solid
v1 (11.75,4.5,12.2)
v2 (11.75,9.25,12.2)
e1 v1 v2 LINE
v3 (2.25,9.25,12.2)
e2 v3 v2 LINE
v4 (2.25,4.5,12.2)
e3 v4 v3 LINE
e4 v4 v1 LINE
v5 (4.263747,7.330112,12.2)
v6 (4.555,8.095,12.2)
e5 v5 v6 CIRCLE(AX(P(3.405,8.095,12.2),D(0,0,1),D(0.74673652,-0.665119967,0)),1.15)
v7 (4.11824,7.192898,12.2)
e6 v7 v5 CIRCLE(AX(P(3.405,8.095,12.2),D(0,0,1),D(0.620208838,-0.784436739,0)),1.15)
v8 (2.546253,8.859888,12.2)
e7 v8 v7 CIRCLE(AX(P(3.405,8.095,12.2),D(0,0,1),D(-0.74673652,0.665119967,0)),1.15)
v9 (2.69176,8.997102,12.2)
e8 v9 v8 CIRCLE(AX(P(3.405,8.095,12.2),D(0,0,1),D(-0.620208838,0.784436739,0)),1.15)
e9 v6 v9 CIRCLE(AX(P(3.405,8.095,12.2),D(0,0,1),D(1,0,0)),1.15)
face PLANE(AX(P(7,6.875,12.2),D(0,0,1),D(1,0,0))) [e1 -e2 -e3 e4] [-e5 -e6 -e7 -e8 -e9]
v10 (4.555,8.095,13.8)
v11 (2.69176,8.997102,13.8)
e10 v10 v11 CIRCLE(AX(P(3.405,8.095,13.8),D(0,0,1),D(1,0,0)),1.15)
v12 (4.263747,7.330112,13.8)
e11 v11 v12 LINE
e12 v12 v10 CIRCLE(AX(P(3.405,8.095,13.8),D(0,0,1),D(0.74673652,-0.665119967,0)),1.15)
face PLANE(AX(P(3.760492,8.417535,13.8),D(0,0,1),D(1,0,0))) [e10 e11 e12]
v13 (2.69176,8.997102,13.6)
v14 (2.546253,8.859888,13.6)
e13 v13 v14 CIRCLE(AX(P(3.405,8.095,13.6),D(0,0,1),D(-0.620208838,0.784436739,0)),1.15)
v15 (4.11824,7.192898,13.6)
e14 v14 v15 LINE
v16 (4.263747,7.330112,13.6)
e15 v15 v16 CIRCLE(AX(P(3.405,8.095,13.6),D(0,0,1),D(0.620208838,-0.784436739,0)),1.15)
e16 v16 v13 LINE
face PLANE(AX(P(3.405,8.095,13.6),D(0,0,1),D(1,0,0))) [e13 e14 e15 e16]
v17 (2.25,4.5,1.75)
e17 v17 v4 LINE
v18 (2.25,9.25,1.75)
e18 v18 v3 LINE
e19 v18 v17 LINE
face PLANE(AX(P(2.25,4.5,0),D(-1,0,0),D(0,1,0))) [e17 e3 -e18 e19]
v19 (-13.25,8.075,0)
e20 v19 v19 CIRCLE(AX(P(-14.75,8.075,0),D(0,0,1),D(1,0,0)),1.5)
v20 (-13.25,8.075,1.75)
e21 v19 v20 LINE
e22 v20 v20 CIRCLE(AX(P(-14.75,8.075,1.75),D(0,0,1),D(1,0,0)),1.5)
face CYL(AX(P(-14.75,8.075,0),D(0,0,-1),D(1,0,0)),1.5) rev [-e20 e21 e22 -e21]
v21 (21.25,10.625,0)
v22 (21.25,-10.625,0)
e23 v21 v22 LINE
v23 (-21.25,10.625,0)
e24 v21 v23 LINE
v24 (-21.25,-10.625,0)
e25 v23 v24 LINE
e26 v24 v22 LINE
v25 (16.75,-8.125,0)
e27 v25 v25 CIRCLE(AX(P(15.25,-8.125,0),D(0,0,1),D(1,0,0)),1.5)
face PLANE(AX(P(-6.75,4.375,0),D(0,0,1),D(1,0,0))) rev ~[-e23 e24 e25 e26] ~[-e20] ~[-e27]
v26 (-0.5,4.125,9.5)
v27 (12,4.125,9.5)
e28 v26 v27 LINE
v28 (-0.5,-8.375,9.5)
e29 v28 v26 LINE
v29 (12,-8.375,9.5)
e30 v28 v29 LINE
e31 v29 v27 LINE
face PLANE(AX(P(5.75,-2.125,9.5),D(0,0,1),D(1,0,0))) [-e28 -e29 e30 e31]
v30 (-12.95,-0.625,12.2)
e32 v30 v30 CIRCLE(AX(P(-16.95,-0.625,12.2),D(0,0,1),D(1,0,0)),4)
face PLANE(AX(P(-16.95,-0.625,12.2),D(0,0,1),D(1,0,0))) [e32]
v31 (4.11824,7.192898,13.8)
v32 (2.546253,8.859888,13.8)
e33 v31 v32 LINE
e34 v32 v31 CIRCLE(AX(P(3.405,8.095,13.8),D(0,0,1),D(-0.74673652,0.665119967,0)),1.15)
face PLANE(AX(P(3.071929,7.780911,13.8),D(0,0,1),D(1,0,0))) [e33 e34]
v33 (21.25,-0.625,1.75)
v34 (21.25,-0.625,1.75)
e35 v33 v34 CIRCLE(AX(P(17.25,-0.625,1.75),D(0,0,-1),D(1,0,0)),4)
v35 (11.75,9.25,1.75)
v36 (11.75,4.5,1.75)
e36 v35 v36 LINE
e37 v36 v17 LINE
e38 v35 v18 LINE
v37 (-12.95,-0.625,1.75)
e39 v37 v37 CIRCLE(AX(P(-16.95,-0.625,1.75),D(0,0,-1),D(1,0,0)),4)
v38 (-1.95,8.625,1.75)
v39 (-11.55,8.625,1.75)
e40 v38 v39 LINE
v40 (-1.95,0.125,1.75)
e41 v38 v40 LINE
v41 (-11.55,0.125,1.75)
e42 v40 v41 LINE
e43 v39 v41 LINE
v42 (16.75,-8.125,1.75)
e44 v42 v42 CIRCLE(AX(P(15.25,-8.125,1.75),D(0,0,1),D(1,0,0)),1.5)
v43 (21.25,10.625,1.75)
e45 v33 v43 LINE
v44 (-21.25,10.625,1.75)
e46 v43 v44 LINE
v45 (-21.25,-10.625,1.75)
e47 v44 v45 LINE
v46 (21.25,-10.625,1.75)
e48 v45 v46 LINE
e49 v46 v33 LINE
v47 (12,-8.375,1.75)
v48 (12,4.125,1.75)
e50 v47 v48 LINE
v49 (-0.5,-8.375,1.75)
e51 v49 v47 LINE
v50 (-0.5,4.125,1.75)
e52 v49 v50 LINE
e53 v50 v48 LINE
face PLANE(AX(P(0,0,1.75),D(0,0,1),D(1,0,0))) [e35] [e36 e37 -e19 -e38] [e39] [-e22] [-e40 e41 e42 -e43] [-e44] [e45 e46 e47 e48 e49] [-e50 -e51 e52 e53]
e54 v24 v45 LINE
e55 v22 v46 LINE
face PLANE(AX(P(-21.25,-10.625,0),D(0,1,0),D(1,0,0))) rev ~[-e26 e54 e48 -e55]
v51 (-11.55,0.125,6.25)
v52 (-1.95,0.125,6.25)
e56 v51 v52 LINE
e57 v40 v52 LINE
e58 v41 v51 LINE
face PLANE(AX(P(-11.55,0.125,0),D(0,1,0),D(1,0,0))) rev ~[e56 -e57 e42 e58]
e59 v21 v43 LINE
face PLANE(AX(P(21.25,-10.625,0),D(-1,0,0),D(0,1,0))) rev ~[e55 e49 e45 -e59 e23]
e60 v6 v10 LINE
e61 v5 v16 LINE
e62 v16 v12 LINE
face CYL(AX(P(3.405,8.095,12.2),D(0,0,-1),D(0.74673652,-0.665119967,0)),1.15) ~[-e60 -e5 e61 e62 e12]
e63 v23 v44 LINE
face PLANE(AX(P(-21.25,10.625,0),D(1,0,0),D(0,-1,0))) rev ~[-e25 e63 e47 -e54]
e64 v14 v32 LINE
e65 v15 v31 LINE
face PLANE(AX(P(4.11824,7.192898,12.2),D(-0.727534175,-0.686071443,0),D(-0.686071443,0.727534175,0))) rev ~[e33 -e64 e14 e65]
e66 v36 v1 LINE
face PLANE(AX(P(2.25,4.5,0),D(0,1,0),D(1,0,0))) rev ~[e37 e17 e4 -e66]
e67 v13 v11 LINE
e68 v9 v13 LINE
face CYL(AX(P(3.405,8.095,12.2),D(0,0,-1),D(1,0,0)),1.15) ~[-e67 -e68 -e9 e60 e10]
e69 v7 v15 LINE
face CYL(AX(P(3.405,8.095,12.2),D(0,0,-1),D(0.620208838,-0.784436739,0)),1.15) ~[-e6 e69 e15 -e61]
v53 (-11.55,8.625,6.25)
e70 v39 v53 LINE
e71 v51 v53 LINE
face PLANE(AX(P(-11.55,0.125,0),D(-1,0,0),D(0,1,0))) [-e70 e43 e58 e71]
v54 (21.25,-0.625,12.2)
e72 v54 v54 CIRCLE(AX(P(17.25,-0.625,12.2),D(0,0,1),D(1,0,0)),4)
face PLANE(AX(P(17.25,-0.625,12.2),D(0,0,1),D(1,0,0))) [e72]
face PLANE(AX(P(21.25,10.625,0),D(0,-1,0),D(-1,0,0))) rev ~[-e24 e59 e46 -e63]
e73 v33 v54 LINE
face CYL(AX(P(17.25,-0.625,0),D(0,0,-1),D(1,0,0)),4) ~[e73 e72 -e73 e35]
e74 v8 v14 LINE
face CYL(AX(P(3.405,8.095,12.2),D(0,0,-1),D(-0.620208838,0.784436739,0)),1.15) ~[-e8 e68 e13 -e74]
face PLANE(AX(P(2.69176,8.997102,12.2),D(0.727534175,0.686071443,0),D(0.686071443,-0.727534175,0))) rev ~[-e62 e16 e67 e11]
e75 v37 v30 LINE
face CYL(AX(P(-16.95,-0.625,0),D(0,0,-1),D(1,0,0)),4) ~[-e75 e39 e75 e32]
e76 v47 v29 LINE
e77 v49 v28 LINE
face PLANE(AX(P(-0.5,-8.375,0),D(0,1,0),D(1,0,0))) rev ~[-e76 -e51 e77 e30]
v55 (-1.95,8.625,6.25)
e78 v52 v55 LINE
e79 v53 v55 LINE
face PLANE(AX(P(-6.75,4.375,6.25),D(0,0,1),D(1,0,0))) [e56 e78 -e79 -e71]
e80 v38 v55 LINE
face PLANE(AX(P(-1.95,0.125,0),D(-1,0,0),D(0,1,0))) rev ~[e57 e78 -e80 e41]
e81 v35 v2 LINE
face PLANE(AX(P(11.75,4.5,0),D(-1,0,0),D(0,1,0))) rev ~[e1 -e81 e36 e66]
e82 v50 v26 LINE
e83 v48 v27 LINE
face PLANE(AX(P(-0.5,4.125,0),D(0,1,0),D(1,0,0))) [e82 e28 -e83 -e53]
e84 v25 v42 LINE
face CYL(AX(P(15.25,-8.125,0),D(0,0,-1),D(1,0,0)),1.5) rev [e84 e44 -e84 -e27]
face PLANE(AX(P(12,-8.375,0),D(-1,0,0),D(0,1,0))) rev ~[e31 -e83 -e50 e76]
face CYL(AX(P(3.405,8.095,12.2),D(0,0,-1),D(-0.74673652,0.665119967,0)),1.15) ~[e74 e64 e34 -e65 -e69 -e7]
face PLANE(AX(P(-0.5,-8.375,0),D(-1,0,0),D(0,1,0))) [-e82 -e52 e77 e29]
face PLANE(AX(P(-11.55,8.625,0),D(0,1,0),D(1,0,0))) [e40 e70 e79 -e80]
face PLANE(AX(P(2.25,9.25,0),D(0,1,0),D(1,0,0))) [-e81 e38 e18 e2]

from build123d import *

# Parameters (mm, degrees)
F0_R     = 4
F0_R_2   = 1.5
F0_W     = 12.5
F0_H     = 12.5
F0_W_2   = 9.6
F0_H_2   = 8.5
F0_W_3   = 9.5
F0_H_3   = 4.75
F1_DEPTH = 1.75
F2_DEPTH = 12.2
F3_DEPTH = 6.25
F4_DEPTH = 9.5
F6_DEPTH = 1.6
F7_DEPTH = 1.4


# Not quite as in the source:
# - a feature names something its author has since deleted; it is built from what else it names


with BuildPart() as f1:
    # F0 (on Top) → F1 (new body)
    with BuildSketch(Plane.XY):
        Polygon((-21.25, 10.625), (-21.25, -10.625), (21.25, -10.625), (21.25, -0.625), (21.25, 10.625), align=None)
        with Locations((-16.95, -0.625)):
            Circle(F0_R, mode=Mode.SUBTRACT)
        with Locations((15.25, -8.125)):
            Circle(F0_R_2, mode=Mode.SUBTRACT)
        with Locations((5.75, -2.125)):
            Rectangle(F0_W, F0_H, mode=Mode.SUBTRACT)
        with Locations((17.25, -0.625)):
            Circle(F0_R, mode=Mode.SUBTRACT)
        with Locations((-6.75, 4.375)):
            Rectangle(F0_W_2, F0_H_2, mode=Mode.SUBTRACT)
        with Locations((-14.75, 8.075)):
            Circle(F0_R_2, mode=Mode.SUBTRACT)
        with Locations((7, 6.875)):
            Rectangle(F0_W_3, F0_H_3, mode=Mode.SUBTRACT)
        with Locations((7, 6.875)):
            Rectangle(F0_W_3, F0_H_3)
        with Locations((-6.75, 4.375)):
            Rectangle(F0_W_2, F0_H_2)
        with Locations((17.25, -0.625)):
            Circle(F0_R)
        with Locations((-16.95, -0.625)):
            Circle(F0_R)
    extrude(amount=F1_DEPTH)

    # F0 (on Top) → F2 (join)
    with BuildSketch(Plane.XY):
        with Locations((17.25, -0.625)):
            Circle(F0_R)
        with Locations((7, 6.875)):
            Rectangle(F0_W_3, F0_H_3)
        with Locations((-16.95, -0.625)):
            Circle(F0_R)
    extrude(amount=F2_DEPTH)

    # F0 (on Top) → F3 (join)
    with BuildSketch(Plane.XY):
        with Locations((-6.75, 4.375)):
            Rectangle(F0_W_2, F0_H_2)
    extrude(amount=F3_DEPTH)

    # F0 (on Top) → F4 (join)
    with BuildSketch(Plane.XY):
        with Locations((5.75, -2.125)):
            Rectangle(F0_W, F0_H)
    extrude(amount=F4_DEPTH)

    # F5 (on face) → F6 (join)
    with BuildSketch(Plane.XY.offset(12.2)):
        with BuildLine():
            Line((4.1182401625, 7.1928977493), (2.5462530026, 8.8598879621))
            ThreePointArc((2.5462530026, 8.8598879621), (2.5683356993, 7.3060178406), (4.1182401625, 7.1928977493))
        make_face()
        with BuildLine():
            ThreePointArc((4.2637469974, 7.3301120379), (4.4797229985, 7.6857684317), (4.555, 8.095))
            ThreePointArc((4.555, 8.095), (3.906135617, 9.1300667096), (2.6917598375, 8.9971022507))
            Line((2.6917598375, 8.9971022507), (4.2637469974, 7.3301120379))
        make_face()
    extrude(amount=F6_DEPTH)

    # F5 (on face) → F7 (join)
    with BuildSketch(Plane.XY.offset(12.2)):
        with BuildLine():
            Line((4.2637469974, 7.3301120379), (2.6917598375, 8.9971022507))
            ThreePointArc((2.6917598375, 8.9971022507), (2.6160178406, 8.9316643007), (2.5462530026, 8.8598879621))
            Line((2.5462530026, 8.8598879621), (4.1182401625, 7.1928977493))
            ThreePointArc((4.1182401625, 7.1928977493), (4.1939821594, 7.2583356993), (4.2637469974, 7.3301120379))
        make_face()
    extrude(amount=F7_DEPTH)


solid = f1.part
